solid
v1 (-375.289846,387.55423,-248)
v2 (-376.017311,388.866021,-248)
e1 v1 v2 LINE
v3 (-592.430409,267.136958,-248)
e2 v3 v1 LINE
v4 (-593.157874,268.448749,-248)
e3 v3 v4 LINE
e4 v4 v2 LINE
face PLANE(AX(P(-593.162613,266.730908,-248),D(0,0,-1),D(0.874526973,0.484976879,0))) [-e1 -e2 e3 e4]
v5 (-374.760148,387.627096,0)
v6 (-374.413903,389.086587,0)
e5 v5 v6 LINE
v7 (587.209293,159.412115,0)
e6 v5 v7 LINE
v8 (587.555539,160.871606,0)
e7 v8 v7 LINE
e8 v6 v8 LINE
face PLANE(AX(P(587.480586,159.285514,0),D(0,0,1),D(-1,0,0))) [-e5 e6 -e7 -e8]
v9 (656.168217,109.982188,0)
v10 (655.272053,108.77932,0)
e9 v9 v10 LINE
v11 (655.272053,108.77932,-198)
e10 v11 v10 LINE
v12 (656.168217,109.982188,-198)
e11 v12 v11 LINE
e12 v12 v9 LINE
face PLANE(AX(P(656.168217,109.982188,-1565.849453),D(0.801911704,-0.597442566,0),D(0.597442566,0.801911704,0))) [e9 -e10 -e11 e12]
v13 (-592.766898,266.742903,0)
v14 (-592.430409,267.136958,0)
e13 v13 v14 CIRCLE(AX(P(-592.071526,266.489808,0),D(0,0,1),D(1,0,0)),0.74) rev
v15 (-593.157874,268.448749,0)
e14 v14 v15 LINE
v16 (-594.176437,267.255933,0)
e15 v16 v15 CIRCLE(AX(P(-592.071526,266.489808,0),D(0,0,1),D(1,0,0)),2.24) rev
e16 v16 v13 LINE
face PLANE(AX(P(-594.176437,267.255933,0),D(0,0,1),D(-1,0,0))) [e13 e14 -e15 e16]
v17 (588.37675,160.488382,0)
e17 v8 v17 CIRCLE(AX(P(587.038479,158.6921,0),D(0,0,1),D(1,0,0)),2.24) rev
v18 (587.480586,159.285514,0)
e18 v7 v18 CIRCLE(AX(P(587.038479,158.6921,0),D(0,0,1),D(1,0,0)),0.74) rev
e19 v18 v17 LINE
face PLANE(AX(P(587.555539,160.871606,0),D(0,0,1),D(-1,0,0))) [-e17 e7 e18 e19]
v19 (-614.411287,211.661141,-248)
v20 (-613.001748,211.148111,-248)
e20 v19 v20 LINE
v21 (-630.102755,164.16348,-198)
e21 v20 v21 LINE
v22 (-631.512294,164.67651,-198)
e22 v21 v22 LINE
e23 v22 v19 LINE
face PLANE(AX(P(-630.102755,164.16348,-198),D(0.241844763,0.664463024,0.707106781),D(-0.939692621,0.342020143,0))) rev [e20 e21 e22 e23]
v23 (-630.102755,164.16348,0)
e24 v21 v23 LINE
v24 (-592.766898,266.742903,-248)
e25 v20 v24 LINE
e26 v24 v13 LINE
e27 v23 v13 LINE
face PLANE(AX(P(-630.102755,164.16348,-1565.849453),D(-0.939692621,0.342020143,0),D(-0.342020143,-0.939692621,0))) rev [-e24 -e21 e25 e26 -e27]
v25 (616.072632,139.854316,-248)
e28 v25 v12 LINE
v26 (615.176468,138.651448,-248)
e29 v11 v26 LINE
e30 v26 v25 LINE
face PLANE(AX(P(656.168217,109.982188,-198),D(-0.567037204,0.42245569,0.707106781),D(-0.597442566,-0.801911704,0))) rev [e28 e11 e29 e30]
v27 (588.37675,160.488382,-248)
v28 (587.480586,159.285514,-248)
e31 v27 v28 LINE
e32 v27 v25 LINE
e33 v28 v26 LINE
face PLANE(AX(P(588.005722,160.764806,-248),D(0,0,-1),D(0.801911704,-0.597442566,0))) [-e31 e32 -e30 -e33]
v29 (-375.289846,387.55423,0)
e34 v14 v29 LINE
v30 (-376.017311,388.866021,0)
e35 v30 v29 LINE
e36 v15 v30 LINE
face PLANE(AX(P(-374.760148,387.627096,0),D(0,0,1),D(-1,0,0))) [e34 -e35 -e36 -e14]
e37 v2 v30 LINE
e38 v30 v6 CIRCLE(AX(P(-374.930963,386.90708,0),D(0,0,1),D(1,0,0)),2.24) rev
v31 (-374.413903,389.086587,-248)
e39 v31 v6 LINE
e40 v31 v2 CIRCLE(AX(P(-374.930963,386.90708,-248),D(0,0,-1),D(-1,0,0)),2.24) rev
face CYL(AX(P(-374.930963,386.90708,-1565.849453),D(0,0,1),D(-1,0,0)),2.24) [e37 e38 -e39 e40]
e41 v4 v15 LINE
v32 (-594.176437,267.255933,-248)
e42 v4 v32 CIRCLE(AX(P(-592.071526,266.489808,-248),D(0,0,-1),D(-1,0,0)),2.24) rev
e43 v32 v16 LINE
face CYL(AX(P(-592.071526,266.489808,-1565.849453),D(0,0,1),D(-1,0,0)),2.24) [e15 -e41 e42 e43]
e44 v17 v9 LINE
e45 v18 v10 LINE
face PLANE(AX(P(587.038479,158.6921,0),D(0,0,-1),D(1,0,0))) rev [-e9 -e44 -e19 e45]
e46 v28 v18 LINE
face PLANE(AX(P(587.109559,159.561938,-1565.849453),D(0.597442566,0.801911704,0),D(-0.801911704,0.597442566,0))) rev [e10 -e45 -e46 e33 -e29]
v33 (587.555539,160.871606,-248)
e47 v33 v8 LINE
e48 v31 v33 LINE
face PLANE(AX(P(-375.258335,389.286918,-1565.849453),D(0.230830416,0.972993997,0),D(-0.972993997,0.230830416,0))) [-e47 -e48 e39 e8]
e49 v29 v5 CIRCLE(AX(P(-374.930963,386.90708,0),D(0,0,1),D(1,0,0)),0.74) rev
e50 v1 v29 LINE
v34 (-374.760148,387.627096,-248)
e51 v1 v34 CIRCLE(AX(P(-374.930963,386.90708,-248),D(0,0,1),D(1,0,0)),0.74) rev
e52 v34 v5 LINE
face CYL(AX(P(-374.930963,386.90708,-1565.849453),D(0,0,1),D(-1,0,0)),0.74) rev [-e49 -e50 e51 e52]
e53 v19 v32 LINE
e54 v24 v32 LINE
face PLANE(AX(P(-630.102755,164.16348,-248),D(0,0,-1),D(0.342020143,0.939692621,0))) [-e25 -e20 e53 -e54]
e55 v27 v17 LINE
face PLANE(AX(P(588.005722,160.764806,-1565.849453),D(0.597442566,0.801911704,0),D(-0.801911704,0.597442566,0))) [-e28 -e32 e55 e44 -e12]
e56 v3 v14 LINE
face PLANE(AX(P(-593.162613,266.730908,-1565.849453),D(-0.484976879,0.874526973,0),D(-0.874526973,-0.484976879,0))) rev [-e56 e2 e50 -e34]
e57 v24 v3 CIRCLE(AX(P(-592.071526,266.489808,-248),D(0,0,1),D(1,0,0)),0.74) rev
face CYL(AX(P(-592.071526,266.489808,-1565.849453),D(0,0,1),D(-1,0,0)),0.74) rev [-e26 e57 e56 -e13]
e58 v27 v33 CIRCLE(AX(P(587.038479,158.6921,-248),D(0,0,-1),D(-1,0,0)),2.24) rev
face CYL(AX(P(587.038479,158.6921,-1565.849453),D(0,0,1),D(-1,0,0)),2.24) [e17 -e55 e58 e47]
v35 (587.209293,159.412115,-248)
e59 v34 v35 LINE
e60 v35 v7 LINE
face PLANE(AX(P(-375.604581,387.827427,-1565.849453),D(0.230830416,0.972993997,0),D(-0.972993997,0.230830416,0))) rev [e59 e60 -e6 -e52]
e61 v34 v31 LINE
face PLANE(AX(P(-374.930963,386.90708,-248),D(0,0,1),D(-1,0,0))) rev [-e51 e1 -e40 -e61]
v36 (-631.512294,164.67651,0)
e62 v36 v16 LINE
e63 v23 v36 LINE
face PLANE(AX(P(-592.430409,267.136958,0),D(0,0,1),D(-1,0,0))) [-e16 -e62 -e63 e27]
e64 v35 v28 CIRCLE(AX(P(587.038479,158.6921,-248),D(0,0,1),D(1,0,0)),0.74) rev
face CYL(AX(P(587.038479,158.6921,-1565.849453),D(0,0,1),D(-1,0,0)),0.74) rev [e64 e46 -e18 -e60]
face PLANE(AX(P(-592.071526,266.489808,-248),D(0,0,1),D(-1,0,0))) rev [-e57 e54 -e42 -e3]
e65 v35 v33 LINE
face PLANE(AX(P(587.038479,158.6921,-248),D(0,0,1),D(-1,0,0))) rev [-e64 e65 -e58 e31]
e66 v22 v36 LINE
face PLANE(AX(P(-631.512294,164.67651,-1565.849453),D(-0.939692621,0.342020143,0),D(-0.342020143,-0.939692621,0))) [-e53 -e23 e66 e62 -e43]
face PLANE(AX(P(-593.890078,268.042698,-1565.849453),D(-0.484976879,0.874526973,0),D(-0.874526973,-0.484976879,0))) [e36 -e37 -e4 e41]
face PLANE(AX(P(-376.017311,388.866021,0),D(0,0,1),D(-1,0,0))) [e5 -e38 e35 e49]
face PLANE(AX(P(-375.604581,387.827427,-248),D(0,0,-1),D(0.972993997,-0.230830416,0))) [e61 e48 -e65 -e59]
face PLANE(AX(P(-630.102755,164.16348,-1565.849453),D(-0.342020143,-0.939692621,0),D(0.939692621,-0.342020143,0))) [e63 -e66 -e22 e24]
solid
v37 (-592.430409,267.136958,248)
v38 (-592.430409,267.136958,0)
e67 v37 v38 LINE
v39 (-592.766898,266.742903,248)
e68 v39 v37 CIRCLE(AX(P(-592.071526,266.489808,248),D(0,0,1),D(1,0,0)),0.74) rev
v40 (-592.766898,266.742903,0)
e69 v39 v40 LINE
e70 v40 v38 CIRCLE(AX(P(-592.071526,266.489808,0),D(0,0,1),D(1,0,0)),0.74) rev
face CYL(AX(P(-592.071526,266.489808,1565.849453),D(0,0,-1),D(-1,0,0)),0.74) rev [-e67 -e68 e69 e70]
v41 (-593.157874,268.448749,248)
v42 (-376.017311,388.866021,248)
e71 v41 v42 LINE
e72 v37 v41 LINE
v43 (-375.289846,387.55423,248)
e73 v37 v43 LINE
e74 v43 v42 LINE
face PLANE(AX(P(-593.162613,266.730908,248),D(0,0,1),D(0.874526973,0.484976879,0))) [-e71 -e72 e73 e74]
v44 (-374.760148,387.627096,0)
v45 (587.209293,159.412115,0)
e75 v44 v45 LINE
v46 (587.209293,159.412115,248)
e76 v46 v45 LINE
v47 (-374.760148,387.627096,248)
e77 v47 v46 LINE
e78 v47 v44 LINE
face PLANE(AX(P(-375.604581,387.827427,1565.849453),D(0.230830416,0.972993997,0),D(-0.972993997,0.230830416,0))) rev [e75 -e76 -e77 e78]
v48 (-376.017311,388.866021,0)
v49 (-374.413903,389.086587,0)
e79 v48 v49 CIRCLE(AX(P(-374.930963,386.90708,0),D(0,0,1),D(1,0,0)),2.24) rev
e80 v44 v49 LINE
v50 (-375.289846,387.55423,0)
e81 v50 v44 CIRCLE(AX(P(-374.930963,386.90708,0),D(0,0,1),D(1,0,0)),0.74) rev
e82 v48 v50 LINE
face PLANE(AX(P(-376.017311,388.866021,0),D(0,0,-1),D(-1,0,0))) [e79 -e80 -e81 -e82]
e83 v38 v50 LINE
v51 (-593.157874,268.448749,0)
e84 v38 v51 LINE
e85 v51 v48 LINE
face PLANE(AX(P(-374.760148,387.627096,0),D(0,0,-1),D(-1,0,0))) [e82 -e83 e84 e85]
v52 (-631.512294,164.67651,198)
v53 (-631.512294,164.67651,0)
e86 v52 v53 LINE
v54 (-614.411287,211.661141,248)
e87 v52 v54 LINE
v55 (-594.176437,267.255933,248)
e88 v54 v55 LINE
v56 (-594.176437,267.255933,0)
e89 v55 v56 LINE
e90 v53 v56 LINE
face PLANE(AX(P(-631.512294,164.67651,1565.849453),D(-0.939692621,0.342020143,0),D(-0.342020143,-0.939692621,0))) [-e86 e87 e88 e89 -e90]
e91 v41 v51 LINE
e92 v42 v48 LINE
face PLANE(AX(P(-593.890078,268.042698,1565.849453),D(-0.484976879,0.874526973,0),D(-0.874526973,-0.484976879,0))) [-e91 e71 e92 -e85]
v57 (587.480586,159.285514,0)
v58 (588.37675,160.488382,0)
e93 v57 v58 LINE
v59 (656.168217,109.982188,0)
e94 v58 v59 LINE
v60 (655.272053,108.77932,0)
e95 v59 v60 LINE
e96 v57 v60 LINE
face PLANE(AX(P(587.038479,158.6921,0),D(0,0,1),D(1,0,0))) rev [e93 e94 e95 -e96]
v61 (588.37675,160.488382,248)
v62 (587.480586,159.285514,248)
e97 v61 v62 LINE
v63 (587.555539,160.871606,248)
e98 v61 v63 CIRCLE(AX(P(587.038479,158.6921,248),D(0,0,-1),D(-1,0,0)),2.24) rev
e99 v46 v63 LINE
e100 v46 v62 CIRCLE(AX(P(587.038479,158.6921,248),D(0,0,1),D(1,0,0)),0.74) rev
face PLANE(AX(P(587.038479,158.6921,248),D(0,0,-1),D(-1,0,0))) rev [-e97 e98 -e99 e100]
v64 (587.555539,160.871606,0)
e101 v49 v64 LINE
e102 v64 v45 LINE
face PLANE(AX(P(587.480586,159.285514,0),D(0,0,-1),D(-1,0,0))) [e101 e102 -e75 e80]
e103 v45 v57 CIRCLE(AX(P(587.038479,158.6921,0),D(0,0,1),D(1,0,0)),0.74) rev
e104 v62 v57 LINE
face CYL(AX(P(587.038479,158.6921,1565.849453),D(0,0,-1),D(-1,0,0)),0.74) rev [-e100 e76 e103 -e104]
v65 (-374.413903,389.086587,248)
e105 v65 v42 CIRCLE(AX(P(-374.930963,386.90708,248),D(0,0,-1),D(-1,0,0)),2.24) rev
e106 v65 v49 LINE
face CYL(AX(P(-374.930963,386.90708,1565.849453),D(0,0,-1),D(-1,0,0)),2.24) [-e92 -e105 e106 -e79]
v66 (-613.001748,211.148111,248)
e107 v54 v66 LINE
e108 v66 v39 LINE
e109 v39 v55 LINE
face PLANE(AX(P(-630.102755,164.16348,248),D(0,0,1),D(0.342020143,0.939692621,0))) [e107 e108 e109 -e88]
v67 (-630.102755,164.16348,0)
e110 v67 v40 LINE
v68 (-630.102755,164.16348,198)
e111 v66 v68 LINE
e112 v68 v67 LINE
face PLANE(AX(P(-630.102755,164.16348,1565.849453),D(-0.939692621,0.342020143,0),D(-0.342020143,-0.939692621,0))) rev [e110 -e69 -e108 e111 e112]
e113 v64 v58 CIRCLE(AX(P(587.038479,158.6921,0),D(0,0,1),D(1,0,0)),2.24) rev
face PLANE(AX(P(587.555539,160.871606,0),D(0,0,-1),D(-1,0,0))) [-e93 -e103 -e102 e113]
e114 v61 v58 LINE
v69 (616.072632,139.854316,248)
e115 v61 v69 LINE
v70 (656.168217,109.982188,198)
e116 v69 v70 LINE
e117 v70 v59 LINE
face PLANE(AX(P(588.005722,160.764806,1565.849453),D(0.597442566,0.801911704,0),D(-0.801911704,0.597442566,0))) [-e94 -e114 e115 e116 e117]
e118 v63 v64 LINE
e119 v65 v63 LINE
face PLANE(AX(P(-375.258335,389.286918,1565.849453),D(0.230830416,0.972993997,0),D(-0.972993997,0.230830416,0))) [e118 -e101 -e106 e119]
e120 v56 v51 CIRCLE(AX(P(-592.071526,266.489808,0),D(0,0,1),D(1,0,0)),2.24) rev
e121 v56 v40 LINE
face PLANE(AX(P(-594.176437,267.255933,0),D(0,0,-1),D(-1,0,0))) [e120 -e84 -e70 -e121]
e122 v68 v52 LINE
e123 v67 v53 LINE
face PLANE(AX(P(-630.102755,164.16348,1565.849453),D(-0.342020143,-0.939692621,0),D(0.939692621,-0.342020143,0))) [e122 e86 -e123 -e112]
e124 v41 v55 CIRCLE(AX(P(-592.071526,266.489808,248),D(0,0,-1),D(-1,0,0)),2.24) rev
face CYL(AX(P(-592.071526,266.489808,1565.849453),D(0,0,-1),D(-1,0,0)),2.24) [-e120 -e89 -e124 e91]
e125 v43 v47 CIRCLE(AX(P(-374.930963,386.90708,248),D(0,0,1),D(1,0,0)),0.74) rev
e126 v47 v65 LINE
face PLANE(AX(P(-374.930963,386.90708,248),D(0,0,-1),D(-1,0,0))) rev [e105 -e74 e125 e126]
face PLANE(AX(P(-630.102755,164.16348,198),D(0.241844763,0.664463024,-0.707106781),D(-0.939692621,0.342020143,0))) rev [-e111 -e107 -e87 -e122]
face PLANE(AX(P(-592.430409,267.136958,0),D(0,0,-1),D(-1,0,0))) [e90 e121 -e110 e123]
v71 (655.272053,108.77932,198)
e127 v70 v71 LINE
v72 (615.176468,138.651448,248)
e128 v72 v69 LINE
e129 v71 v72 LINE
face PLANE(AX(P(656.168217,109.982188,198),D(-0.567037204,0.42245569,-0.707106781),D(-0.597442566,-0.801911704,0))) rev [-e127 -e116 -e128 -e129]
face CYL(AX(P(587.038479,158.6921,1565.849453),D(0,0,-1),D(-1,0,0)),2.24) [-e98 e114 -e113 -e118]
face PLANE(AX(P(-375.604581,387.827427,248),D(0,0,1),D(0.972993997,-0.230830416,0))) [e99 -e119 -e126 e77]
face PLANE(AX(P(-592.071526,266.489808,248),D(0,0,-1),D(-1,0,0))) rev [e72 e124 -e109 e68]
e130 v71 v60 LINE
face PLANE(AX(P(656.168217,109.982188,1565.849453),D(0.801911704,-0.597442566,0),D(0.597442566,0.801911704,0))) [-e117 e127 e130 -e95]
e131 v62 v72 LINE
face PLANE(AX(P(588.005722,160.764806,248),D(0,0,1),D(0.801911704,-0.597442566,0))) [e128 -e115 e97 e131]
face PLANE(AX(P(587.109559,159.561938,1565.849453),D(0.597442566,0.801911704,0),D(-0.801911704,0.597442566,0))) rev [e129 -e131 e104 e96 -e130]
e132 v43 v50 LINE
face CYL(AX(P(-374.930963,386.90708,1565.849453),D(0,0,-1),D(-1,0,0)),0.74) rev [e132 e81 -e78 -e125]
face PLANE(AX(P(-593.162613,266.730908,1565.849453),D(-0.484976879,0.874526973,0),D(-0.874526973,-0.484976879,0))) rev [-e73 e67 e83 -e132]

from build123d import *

# Parameters (mm, degrees)
SM_BASE_FLANGE_1_DEPTH = 248
CHAMFER_1_SIZE         = 50


# Sheet-metal steps are written as plain solids
with BuildPart() as part:
    # Sketch 1 → Базовая кромка1 (new body)
    with BuildSketch(Plane.XY):
        with BuildLine():
            Line((-631.512294125, 164.676509864), (-594.176437308, 267.255933406))
            ThreePointArc((-594.176437308, 267.255933406), (-593.774974301, 267.944409031), (-593.157874046, 268.448748705))
            Line((-593.157874046, 268.448748705), (-376.017310888, 388.866020848))
            ThreePointArc((-376.017310888, 388.866020848), (-375.23622418, 389.126182817), (-374.413902548, 389.086586981))
            Line((-374.413902548, 389.086586981), (587.555538712, 160.871606081))
            ThreePointArc((587.555538712, 160.871606081), (587.985726672, 160.721956923), (588.376749927, 160.488381743))
            Line((588.376749927, 160.488381743), (656.168217212, 109.982187653))
            Line((656.168217212, 109.982187653), (655.272053364, 108.779320098))
            Line((655.272053364, 108.779320098), (587.480586079, 159.285514187))
            ThreePointArc((587.480586079, 159.285514187), (587.351408753, 159.362677417), (587.209293088, 159.412115085))
            Line((587.209293088, 159.412115085), (-374.760148172, 387.627095985))
            ThreePointArc((-374.760148172, 387.627095985), (-375.031807997, 387.640176753), (-375.28984557, 387.554230388))
            Line((-375.28984557, 387.554230388), (-592.430408728, 267.136958245))
            ThreePointArc((-592.430408728, 267.136958245), (-592.634272205, 266.970346031), (-592.766898377, 266.742903191))
            Line((-592.766898377, 266.742903191), (-630.102755194, 164.163479649))
            Line((-630.102755194, 164.163479649), (-631.512294125, 164.676509864))
        make_face()
    extrude(amount=SM_BASE_FLANGE_1_DEPTH)

    # Фаска1
    chamfer_1_edges = [part.edges().sort_by_distance(p)[0] for p in [
        (-630.80752466, 164.419994757, 248),
        (655.720135288, 109.380753875, 248),
    ]]
    chamfer(chamfer_1_edges, length=CHAMFER_1_SIZE)


with BuildPart() as body_2:
    # Зеркальное отражение1: mirrored copy
    add(part.part.mirror(Plane(origin=(587.480586079, 159.285514187, 0), x_dir=(1, 0, 0), z_dir=(0, 0, -1))))


solid = Compound([part.part, body_2.part])
